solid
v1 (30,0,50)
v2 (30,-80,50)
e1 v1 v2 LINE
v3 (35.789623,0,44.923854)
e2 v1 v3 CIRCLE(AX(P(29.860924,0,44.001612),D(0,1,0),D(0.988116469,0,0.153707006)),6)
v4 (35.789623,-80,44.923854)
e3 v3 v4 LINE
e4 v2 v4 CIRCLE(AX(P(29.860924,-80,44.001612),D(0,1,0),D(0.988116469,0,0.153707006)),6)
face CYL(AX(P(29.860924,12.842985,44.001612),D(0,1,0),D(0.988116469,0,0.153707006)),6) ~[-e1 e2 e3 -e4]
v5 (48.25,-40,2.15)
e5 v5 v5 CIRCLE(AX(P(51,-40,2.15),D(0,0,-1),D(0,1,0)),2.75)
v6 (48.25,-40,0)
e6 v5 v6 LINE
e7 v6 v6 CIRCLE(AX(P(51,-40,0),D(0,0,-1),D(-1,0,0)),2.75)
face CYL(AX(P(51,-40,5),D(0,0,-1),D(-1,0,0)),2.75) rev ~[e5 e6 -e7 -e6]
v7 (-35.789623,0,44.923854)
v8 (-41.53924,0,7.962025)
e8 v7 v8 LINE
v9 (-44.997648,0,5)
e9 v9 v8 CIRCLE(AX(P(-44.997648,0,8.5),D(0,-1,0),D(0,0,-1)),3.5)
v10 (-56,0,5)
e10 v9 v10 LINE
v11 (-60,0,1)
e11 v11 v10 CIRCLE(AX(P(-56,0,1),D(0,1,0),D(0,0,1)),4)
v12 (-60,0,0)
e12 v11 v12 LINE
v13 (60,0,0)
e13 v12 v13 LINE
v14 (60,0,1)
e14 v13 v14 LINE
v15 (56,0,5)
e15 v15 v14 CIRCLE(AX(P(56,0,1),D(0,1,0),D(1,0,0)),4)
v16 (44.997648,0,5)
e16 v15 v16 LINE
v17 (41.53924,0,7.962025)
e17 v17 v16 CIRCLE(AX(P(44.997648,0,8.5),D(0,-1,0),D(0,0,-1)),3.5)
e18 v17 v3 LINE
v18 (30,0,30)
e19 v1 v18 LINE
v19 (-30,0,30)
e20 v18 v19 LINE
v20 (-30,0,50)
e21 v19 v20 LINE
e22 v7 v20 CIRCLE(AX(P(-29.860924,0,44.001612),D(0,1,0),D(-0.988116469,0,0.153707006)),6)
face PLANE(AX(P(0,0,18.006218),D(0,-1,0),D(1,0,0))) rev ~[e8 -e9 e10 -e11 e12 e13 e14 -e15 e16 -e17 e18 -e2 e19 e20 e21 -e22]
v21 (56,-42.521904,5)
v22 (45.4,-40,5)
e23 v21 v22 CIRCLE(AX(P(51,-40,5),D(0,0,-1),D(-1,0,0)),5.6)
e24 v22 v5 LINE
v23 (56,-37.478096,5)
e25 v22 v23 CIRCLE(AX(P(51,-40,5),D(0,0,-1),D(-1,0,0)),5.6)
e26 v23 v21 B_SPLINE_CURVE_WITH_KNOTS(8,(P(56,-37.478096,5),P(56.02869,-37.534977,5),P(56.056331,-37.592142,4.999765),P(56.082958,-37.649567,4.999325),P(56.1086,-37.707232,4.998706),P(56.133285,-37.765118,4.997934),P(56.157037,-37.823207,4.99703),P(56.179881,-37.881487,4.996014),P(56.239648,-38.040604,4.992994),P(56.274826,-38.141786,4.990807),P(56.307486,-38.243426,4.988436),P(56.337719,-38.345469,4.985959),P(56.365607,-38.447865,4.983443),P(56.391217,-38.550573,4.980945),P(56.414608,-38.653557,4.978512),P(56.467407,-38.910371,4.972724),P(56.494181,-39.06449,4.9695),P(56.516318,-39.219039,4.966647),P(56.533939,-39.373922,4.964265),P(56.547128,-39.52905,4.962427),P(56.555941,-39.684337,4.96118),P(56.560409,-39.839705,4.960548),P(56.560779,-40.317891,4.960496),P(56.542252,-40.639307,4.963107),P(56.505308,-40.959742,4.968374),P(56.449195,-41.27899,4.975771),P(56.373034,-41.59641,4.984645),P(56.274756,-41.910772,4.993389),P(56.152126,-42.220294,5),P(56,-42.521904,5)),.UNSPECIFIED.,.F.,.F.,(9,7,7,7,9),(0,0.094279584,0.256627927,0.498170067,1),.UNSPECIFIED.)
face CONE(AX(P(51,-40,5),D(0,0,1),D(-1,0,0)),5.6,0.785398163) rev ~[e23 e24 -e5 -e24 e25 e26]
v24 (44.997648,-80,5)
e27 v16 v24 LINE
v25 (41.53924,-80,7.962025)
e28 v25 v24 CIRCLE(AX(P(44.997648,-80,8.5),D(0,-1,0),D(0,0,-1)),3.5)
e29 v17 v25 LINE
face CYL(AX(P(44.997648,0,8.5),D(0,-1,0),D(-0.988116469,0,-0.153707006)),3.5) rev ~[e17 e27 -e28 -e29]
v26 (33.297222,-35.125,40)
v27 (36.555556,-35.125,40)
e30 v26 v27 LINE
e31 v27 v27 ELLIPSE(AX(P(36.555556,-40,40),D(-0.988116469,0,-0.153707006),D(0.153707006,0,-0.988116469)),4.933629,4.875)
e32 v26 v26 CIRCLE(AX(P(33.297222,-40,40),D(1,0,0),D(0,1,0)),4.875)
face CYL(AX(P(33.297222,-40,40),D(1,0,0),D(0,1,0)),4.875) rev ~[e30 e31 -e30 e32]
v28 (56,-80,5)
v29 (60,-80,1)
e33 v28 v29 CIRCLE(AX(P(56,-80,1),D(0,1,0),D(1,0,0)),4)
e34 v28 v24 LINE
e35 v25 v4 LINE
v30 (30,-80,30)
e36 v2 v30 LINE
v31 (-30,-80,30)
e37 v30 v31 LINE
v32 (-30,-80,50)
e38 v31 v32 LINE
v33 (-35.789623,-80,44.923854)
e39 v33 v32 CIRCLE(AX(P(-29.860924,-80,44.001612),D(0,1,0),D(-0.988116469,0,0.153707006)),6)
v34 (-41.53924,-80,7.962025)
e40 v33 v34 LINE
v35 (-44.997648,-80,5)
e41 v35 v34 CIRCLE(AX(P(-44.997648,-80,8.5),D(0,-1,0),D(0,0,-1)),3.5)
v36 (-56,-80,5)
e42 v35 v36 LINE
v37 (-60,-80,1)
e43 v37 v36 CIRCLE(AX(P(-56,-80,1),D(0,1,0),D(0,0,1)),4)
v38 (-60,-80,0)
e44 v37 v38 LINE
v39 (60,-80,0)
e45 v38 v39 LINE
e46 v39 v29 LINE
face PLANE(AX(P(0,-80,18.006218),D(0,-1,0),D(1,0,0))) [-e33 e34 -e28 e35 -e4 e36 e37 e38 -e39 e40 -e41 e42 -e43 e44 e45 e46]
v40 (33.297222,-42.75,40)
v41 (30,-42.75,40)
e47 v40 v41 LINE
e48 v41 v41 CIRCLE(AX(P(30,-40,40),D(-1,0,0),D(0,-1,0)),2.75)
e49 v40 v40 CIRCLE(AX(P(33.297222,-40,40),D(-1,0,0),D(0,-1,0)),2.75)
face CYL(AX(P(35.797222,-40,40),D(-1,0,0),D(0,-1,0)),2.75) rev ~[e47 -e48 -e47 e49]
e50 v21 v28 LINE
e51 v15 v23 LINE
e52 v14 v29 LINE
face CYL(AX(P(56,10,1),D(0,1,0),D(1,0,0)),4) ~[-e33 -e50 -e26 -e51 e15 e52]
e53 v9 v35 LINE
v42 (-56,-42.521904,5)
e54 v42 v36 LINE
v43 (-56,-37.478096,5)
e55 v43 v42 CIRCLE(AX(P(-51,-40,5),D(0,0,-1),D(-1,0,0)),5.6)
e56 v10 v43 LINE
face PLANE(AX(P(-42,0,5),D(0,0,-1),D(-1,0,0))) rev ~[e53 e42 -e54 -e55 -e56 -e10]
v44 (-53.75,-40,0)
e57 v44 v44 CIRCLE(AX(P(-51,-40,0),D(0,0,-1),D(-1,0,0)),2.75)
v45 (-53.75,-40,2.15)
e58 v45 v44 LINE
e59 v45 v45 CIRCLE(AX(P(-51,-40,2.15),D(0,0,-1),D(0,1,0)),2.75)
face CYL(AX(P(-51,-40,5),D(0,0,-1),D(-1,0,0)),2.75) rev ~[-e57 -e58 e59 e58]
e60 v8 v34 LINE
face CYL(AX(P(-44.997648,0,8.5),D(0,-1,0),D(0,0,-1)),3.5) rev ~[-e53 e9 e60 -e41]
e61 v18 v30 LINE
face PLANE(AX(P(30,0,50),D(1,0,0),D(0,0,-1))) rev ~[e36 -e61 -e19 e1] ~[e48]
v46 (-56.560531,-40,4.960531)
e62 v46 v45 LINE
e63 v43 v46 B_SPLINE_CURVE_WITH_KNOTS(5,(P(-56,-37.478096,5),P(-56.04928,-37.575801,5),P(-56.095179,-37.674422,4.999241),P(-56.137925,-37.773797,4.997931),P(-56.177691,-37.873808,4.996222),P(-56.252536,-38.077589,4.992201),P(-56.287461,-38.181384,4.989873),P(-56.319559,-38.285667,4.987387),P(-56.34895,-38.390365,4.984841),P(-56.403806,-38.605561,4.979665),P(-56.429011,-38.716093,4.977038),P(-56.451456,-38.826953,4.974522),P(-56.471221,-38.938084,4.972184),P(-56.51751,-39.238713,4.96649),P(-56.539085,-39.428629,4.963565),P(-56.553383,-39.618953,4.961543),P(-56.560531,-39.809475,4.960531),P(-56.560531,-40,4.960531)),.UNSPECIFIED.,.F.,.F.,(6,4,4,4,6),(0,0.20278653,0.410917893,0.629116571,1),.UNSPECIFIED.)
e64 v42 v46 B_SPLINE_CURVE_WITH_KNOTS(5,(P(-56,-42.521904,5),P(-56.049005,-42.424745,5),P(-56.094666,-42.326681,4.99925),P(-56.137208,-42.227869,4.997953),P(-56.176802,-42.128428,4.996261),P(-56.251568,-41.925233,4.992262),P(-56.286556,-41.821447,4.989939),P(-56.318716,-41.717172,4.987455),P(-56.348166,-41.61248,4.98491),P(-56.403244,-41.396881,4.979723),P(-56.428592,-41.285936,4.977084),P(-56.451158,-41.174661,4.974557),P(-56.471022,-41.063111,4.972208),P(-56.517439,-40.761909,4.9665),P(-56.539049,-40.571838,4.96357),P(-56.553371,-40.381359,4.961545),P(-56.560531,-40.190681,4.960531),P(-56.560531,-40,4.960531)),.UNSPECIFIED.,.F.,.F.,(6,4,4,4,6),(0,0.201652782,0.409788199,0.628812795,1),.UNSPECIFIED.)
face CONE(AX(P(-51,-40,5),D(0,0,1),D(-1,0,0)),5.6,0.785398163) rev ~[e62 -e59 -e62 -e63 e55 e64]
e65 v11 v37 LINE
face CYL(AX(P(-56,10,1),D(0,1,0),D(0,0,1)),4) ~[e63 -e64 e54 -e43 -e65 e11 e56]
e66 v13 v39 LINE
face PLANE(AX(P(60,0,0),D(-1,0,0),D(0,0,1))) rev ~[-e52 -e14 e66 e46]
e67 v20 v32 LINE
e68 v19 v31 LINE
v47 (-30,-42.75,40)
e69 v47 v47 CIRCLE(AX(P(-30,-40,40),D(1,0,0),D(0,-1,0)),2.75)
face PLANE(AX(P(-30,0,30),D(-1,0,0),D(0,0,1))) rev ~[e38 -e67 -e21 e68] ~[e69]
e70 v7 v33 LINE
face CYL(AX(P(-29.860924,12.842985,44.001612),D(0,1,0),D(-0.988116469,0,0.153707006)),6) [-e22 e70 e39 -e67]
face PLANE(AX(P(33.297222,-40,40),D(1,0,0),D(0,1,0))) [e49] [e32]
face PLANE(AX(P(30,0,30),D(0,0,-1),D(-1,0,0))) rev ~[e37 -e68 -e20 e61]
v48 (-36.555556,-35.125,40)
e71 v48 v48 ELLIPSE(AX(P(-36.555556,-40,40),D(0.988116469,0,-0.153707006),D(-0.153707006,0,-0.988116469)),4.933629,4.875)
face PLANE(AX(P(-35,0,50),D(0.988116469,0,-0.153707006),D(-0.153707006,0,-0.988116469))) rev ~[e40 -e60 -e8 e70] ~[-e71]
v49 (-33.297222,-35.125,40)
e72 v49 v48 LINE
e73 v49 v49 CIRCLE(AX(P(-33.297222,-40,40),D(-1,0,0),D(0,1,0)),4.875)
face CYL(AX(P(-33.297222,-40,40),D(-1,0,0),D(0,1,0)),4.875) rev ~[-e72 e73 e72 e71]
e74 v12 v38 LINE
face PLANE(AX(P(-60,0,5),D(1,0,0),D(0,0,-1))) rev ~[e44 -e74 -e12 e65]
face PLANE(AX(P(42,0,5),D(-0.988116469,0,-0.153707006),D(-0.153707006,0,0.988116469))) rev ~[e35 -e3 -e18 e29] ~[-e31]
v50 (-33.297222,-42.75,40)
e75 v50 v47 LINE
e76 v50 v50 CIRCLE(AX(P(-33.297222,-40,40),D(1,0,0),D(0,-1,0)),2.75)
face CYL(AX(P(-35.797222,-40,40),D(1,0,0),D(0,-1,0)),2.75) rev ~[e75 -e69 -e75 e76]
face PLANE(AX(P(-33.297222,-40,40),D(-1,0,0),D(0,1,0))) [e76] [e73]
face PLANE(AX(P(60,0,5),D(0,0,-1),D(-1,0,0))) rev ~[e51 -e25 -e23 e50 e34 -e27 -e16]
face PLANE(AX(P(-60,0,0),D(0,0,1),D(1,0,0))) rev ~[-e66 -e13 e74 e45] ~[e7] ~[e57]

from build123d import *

# Parameters (mm, degrees)
F1_DEPTH              = 80
F10_D                 = 5.5
F10_DEPTH             = 10
F10_CSINK_D           = 11.2
F10_CSINK_ANGLE       = 90
F10_TIP               = 1.6523667023
F10_ON_F3_D           = 5.5
F10_ON_F3_DEPTH       = 10
F10_ON_F3_CSINK_D     = 11.2
F10_ON_F3_CSINK_ANGLE = 90
F10_ON_F3_TIP         = 1.6523667023
F11_D                 = 5.5
F11_DEPTH             = 10
F11_START             = 2.7027778
F11_CBORE_D           = 9.75
F11_CBORE_DEPTH       = 2.5
F11_TIP               = 1.6523667023
F12_D                 = 5.5
F12_DEPTH             = 10
F12_START             = 2.7027778
F12_CBORE_D           = 9.75
F12_CBORE_DEPTH       = 2.5
F12_TIP               = 1.6523667023
F13_T1_DEPTH          = 105.6859695087
F14_R                 = 3.5
F15_T1_DEPTH          = 100


# Not quite as in the source:
# - a fillet or chamfer that OpenCascade refuses, or shapes differently, is made with other operations: its cross-section is extruded or revolved along the edge and cut away or added


with BuildPart() as f1:
    # F0 (on Front) → F1 (new body)
    with BuildSketch(Plane.XZ):
        Polygon((-60, 5), (-60, 0), (60, 0), (60, 5), (42, 5), (35, 50), (30, 50), (30, 30), (-30, 30), (-30, 50), (-35, 50), (-42, 5), align=None)
    extrude(amount=F1_DEPTH)

    # F10
    with Locations(Plane.XY.offset(5)):
        with Locations((-51, -40)):
            CounterSinkHole(F10_D / 2, F10_CSINK_D / 2, depth=F10_DEPTH, counter_sink_angle=F10_CSINK_ANGLE)
            with Locations((0, 0, -(F10_DEPTH + F10_TIP / 2))):  # 118° drill point
                Cone(0, F10_D / 2, F10_TIP, mode=Mode.SUBTRACT)

    # F10 on F3
    with Locations(Plane.XY.offset(5)):
        with Locations((51, -40)):
            CounterSinkHole(F10_ON_F3_D / 2, F10_ON_F3_CSINK_D / 2, depth=F10_ON_F3_DEPTH, counter_sink_angle=F10_ON_F3_CSINK_ANGLE)
            with Locations((0, 0, -(F10_ON_F3_DEPTH + F10_ON_F3_TIP / 2))):  # 118° drill point
                Cone(0, F10_ON_F3_D / 2, F10_ON_F3_TIP, mode=Mode.SUBTRACT)

    # F11
    # its depths count from where the whole tool has entered the part; down to there all is cleared
    with Locations(Plane(origin=(-38.5, 0, 0), x_dir=(0, 1, 0), z_dir=(-1, 0, 0)).offset(-F11_START)):
        with Locations((-40, -40)):
            CounterBoreHole(F11_D / 2, F11_CBORE_D / 2, F11_CBORE_DEPTH, depth=F11_DEPTH)
            with Locations((0, 0, -(F11_DEPTH + F11_TIP / 2))):  # 118° drill point
                Cone(0, F11_D / 2, F11_TIP, mode=Mode.SUBTRACT)

    # F12
    # its depths count from where the whole tool has entered the part; down to there all is cleared
    with Locations(Plane.YZ.offset(38.5).offset(-F12_START)):
        with Locations((-40, 40)):
            CounterBoreHole(F12_D / 2, F12_CBORE_D / 2, F12_CBORE_DEPTH, depth=F12_DEPTH)
            with Locations((0, 0, -(F12_DEPTH + F12_TIP / 2))):  # 118° drill point
                Cone(0, F12_D / 2, F12_TIP, mode=Mode.SUBTRACT)

    # F13: fillet of radius 6 on 2 edges, made by hand

    # F13_s2 → F13_t1 (cut)
    with BuildSketch(Plane.XZ.offset(-12.8429847543)):
        with BuildLine():
            ThreePointArc((-35.7896226953, 44.9238541015), (-33.8164627137, 48.513120963), (-30, 50))
            Line((-30, 50), (-35, 50))
            Line((-35, 50), (-35.7896226953, 44.9238541015))
        make_face()
        with BuildLine():
            ThreePointArc((35.7896226953, 44.9238541015), (33.8164627137, 48.513120963), (30, 50))
            Line((30, 50), (35, 50))
            Line((35, 50), (35.7896226953, 44.9238541015))
        make_face()
    extrude(amount=F13_T1_DEPTH, mode=Mode.SUBTRACT)

    # F14
    f14_edges = [f1.edges().sort_by_distance(p)[0] for p in [
        (-42, -40, 5),
        (42, -40, 5),
    ]]
    fillet(f14_edges, radius=F14_R)

    # F15: fillet of radius 4 on 2 edges, made by hand

    # F15_s2 → F15_t1 (cut)
    with BuildSketch(Plane.XZ.offset(-10)):
        with BuildLine():
            ThreePointArc((-56, 5), (-58.8284271247, 3.8284271247), (-60, 1))
            Line((-60, 1), (-60, 5))
            Line((-60, 5), (-56, 5))
        make_face()
        with BuildLine():
            ThreePointArc((60, 1), (58.8284271247, 3.8284271247), (56, 5))
            Line((56, 5), (60, 5))
            Line((60, 5), (60, 1))
        make_face()
    extrude(amount=F15_T1_DEPTH, mode=Mode.SUBTRACT)


solid = f1.part
